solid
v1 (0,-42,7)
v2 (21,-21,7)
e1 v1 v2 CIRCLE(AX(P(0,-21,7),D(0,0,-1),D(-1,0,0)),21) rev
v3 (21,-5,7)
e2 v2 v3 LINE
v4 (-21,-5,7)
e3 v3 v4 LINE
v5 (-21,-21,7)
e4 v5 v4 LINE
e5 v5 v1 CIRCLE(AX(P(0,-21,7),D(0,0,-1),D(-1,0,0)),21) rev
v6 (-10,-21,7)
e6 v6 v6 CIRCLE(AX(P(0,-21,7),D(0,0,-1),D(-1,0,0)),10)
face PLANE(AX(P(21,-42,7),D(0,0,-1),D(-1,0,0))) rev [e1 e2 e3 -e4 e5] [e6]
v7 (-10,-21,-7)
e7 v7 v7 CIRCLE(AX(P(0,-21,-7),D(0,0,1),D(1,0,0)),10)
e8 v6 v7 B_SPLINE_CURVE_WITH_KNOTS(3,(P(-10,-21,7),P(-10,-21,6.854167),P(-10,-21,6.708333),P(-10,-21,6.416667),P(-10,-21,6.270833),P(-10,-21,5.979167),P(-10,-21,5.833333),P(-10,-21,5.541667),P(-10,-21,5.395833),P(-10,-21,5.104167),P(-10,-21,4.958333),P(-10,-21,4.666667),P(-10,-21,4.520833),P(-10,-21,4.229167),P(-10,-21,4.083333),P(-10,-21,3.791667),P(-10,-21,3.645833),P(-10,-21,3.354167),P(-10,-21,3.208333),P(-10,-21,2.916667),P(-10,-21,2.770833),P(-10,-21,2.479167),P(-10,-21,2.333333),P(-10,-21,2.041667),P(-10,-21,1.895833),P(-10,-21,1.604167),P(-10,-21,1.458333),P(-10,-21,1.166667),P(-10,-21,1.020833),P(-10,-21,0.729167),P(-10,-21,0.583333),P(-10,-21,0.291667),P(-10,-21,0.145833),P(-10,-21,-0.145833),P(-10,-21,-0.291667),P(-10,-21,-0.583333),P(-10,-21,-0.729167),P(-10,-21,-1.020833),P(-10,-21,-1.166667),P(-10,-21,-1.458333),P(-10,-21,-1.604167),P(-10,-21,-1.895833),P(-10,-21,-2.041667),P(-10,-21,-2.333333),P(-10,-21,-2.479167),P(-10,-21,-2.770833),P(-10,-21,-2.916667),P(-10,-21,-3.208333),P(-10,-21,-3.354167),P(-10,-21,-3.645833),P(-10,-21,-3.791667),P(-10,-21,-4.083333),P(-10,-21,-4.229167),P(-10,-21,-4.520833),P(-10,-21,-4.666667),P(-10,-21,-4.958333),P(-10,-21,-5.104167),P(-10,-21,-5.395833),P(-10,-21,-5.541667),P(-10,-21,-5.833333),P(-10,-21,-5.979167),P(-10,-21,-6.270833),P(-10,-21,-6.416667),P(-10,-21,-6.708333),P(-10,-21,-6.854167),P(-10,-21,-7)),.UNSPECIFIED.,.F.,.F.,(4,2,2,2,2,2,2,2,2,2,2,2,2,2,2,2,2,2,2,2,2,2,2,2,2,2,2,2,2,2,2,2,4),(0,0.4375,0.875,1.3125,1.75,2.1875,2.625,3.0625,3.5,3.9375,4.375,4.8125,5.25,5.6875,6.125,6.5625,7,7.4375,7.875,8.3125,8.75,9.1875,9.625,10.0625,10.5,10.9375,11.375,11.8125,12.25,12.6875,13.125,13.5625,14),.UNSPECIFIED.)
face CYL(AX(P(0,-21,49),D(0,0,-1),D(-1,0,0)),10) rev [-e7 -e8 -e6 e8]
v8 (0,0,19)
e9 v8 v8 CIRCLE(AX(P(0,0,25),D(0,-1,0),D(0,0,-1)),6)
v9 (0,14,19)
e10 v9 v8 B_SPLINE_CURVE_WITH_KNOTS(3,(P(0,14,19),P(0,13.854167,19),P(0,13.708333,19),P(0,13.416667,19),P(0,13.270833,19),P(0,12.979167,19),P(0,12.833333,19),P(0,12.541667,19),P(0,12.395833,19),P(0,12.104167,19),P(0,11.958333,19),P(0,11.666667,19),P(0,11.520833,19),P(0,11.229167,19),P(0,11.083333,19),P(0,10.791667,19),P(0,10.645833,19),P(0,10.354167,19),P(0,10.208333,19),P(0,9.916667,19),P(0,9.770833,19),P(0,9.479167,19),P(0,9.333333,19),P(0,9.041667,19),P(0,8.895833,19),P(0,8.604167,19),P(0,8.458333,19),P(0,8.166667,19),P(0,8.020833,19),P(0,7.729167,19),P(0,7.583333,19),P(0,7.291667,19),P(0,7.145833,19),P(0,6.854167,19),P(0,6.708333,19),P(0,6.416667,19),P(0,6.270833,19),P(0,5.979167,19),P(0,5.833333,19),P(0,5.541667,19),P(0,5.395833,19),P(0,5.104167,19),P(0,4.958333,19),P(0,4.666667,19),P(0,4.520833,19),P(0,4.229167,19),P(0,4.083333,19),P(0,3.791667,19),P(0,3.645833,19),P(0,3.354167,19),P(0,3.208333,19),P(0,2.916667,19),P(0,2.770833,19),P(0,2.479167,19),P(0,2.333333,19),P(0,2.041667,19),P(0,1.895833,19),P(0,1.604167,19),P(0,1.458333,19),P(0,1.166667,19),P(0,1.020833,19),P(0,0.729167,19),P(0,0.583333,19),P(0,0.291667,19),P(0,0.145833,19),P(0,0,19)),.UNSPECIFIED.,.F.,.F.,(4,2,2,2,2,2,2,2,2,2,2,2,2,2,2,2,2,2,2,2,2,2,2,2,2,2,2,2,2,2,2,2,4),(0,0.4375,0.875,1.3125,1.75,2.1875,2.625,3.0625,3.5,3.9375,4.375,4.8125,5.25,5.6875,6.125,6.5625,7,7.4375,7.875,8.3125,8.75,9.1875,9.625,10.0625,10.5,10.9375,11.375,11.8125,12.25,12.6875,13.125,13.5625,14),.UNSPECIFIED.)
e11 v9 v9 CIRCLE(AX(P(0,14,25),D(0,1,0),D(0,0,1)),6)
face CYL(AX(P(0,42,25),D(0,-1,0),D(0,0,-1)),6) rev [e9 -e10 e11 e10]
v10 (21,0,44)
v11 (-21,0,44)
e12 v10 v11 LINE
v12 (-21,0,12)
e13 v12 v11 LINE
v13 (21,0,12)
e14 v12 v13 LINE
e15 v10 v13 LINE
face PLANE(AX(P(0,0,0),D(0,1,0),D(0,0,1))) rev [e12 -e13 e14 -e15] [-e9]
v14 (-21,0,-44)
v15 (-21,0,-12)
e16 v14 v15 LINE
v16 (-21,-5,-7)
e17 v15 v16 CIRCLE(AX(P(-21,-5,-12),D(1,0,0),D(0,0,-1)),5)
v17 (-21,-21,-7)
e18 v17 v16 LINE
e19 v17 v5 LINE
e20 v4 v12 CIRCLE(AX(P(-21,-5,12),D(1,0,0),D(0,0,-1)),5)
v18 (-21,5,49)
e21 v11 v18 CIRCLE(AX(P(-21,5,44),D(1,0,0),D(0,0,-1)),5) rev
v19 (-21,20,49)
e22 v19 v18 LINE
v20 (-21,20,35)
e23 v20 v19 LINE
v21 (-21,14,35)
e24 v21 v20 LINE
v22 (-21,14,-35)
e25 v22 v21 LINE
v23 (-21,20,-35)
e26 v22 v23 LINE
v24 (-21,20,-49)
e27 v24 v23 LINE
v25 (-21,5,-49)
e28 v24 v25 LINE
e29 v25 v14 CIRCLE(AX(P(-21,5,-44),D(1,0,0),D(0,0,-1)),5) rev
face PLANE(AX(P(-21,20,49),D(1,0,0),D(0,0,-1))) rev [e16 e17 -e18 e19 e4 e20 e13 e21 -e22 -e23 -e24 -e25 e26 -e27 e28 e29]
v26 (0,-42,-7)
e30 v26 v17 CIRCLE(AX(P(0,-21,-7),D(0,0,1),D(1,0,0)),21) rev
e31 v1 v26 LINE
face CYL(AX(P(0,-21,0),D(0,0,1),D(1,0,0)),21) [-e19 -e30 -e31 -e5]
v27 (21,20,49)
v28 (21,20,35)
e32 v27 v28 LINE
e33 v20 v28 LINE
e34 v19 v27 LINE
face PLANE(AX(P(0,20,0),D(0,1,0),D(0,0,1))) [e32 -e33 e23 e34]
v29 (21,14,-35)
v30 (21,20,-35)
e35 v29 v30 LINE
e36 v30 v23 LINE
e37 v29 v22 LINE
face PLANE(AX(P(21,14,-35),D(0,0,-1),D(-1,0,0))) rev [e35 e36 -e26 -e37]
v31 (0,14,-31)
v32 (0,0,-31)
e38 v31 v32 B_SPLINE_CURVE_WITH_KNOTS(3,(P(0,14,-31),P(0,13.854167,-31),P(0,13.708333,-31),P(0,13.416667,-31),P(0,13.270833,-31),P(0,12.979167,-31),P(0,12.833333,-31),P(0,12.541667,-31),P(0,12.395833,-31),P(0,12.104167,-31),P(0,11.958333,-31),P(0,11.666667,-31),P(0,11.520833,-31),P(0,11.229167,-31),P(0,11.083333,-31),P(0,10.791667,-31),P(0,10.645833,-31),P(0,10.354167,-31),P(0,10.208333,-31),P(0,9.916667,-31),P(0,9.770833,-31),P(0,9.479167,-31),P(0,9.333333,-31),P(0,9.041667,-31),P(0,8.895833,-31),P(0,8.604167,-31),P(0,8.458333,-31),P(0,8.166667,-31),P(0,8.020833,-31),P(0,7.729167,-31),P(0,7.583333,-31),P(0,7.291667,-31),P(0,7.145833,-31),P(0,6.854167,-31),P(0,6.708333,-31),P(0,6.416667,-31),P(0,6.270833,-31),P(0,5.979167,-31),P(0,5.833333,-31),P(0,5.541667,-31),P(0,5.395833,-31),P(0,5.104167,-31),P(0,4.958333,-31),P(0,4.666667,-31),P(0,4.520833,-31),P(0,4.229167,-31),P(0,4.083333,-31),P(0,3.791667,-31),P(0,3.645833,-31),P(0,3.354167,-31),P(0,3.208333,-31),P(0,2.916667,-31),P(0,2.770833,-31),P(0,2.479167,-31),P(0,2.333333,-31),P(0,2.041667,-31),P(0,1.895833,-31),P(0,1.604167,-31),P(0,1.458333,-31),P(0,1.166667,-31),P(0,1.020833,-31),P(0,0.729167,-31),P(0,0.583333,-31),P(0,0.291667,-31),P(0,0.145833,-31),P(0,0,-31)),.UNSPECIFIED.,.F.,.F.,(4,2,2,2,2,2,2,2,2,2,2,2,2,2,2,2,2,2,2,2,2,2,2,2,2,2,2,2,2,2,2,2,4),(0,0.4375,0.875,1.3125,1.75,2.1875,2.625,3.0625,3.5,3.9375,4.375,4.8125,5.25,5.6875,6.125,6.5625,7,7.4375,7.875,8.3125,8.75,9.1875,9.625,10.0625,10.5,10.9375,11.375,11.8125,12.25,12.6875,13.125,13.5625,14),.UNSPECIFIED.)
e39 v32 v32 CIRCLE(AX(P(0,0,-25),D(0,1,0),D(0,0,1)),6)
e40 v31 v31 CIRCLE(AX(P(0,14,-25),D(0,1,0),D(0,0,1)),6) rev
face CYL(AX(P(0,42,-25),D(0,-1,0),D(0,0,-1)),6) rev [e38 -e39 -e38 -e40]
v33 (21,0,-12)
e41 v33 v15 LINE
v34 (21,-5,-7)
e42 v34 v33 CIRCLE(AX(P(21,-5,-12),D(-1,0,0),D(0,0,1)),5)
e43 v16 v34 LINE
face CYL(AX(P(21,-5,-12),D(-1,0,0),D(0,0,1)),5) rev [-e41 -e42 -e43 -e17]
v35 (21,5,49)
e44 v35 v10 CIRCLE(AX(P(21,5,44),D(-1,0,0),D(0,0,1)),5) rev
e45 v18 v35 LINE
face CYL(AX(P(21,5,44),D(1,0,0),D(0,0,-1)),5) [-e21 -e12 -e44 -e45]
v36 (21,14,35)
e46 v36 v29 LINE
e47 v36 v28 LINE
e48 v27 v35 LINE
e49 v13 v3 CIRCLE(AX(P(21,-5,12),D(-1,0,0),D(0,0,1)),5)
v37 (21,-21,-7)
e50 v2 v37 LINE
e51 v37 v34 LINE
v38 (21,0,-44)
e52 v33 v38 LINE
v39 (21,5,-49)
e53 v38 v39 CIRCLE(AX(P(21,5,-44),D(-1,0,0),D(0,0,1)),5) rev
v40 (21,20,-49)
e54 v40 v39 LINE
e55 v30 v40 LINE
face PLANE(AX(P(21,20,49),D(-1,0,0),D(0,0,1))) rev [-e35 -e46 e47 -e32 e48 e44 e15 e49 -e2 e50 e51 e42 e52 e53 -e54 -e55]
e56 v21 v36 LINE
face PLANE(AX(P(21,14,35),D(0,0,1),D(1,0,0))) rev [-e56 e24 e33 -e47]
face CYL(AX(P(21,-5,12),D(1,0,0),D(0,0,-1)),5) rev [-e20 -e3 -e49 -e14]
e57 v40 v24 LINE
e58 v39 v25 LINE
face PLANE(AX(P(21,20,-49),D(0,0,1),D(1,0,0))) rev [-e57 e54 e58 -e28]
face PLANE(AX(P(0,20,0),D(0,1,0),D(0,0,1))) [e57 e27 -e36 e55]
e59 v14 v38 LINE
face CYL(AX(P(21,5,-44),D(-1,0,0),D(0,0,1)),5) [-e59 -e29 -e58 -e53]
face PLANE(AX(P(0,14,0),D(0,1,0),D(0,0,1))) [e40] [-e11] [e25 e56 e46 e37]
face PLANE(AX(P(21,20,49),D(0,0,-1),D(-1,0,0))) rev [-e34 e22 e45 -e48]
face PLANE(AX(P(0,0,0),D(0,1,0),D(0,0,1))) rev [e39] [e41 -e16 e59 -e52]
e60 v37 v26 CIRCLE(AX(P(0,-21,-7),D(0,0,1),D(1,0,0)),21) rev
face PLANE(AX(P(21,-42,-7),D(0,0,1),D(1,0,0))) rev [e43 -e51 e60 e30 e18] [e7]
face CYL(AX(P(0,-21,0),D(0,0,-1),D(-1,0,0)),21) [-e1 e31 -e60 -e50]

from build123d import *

# Parameters (mm, degrees)
SKETCH1_W               = 42
SKETCH1_H               = 98
BOSS_EXTRUDE1_DEPTH     = 20
SKETCH2_W               = 42
SKETCH2_H               = 70
CUT_EXTRUDE1_DEPTH      = 6
SKETCH3_W               = 42
SKETCH3_H               = 14
BOSS_EXTRUDE2_DEPTH     = 42
FILLET1_R               = 21
CUT_EXTRUDE2_DEPTH      = 74.082145562
CUT_EXTRUDE2_DEPTH_BACK = 74.082145562
SKETCH4_R               = 10
SKETCH6_R               = 6
CUT_EXTRUDE3_DEPTH      = 42
FILLET2_R               = 5


with BuildPart() as part:
    # Sketch1 → Boss-Extrude1 (new body)
    with BuildSketch(Plane(origin=(0, 0, 0), x_dir=(1, 0, 0), z_dir=(0, 1, 0))):
        Rectangle(SKETCH1_W, SKETCH1_H)
    extrude(amount=BOSS_EXTRUDE1_DEPTH)

    # Sketch2 → Cut-Extrude1 (cut)
    with BuildSketch(Plane(origin=(0, 20, 0), x_dir=(1, 0, 0), z_dir=(0, 1, 0))):
        Rectangle(SKETCH2_W, SKETCH2_H)
    extrude(amount=-CUT_EXTRUDE1_DEPTH, mode=Mode.SUBTRACT)

    # Sketch3 → Boss-Extrude2 (add)
    with BuildSketch(Plane.XZ):
        Rectangle(SKETCH3_W, SKETCH3_H)
    extrude(amount=BOSS_EXTRUDE2_DEPTH)

    # Fillet1
    fillet1_edges = [part.edges().sort_by_distance(p)[0] for p in [
        (21, -42, 0),
        (-21, -42, 0),
    ]]
    fillet(fillet1_edges, radius=FILLET1_R - 0.0001)  # a hair under: the kernel refuses the full size

    # Sketch4 → Cut-Extrude2 (cut, two sides: drawn at the far end of the back side and taken through both)
    with BuildSketch(Plane(origin=(0, 0, -7), x_dir=(-1, 0, 0), z_dir=(0, 0, -1)).offset(-CUT_EXTRUDE2_DEPTH_BACK)):
        with Locations((0, -21)):
            Circle(SKETCH4_R)
    extrude(amount=CUT_EXTRUDE2_DEPTH + CUT_EXTRUDE2_DEPTH_BACK, mode=Mode.SUBTRACT)

    # Sketch6 → Cut-Extrude3 (cut)
    with BuildSketch(Plane(origin=(0, 0, 0), x_dir=(1, 0, 0), z_dir=(0, 1, 0))):
        with Locations(Location((0, 25, 0), (0, 0, 90))):
            Circle(SKETCH6_R)
    cut_extrude3 = extrude(amount=CUT_EXTRUDE3_DEPTH, mode=Mode.SUBTRACT)

    # Mirror1: Cut-Extrude3 across plane
    add(cut_extrude3.mirror(Plane.XY), mode=Mode.SUBTRACT)

    # Fillet2
    fillet2_edges = [part.edges().sort_by_distance(p)[0] for p in [
        (0, 0, -7),
        (0, 0, 7),
        (0, 0, -49),
        (0, 0, 49),
    ]]
    fillet(fillet2_edges, radius=FILLET2_R)


solid = part.part
